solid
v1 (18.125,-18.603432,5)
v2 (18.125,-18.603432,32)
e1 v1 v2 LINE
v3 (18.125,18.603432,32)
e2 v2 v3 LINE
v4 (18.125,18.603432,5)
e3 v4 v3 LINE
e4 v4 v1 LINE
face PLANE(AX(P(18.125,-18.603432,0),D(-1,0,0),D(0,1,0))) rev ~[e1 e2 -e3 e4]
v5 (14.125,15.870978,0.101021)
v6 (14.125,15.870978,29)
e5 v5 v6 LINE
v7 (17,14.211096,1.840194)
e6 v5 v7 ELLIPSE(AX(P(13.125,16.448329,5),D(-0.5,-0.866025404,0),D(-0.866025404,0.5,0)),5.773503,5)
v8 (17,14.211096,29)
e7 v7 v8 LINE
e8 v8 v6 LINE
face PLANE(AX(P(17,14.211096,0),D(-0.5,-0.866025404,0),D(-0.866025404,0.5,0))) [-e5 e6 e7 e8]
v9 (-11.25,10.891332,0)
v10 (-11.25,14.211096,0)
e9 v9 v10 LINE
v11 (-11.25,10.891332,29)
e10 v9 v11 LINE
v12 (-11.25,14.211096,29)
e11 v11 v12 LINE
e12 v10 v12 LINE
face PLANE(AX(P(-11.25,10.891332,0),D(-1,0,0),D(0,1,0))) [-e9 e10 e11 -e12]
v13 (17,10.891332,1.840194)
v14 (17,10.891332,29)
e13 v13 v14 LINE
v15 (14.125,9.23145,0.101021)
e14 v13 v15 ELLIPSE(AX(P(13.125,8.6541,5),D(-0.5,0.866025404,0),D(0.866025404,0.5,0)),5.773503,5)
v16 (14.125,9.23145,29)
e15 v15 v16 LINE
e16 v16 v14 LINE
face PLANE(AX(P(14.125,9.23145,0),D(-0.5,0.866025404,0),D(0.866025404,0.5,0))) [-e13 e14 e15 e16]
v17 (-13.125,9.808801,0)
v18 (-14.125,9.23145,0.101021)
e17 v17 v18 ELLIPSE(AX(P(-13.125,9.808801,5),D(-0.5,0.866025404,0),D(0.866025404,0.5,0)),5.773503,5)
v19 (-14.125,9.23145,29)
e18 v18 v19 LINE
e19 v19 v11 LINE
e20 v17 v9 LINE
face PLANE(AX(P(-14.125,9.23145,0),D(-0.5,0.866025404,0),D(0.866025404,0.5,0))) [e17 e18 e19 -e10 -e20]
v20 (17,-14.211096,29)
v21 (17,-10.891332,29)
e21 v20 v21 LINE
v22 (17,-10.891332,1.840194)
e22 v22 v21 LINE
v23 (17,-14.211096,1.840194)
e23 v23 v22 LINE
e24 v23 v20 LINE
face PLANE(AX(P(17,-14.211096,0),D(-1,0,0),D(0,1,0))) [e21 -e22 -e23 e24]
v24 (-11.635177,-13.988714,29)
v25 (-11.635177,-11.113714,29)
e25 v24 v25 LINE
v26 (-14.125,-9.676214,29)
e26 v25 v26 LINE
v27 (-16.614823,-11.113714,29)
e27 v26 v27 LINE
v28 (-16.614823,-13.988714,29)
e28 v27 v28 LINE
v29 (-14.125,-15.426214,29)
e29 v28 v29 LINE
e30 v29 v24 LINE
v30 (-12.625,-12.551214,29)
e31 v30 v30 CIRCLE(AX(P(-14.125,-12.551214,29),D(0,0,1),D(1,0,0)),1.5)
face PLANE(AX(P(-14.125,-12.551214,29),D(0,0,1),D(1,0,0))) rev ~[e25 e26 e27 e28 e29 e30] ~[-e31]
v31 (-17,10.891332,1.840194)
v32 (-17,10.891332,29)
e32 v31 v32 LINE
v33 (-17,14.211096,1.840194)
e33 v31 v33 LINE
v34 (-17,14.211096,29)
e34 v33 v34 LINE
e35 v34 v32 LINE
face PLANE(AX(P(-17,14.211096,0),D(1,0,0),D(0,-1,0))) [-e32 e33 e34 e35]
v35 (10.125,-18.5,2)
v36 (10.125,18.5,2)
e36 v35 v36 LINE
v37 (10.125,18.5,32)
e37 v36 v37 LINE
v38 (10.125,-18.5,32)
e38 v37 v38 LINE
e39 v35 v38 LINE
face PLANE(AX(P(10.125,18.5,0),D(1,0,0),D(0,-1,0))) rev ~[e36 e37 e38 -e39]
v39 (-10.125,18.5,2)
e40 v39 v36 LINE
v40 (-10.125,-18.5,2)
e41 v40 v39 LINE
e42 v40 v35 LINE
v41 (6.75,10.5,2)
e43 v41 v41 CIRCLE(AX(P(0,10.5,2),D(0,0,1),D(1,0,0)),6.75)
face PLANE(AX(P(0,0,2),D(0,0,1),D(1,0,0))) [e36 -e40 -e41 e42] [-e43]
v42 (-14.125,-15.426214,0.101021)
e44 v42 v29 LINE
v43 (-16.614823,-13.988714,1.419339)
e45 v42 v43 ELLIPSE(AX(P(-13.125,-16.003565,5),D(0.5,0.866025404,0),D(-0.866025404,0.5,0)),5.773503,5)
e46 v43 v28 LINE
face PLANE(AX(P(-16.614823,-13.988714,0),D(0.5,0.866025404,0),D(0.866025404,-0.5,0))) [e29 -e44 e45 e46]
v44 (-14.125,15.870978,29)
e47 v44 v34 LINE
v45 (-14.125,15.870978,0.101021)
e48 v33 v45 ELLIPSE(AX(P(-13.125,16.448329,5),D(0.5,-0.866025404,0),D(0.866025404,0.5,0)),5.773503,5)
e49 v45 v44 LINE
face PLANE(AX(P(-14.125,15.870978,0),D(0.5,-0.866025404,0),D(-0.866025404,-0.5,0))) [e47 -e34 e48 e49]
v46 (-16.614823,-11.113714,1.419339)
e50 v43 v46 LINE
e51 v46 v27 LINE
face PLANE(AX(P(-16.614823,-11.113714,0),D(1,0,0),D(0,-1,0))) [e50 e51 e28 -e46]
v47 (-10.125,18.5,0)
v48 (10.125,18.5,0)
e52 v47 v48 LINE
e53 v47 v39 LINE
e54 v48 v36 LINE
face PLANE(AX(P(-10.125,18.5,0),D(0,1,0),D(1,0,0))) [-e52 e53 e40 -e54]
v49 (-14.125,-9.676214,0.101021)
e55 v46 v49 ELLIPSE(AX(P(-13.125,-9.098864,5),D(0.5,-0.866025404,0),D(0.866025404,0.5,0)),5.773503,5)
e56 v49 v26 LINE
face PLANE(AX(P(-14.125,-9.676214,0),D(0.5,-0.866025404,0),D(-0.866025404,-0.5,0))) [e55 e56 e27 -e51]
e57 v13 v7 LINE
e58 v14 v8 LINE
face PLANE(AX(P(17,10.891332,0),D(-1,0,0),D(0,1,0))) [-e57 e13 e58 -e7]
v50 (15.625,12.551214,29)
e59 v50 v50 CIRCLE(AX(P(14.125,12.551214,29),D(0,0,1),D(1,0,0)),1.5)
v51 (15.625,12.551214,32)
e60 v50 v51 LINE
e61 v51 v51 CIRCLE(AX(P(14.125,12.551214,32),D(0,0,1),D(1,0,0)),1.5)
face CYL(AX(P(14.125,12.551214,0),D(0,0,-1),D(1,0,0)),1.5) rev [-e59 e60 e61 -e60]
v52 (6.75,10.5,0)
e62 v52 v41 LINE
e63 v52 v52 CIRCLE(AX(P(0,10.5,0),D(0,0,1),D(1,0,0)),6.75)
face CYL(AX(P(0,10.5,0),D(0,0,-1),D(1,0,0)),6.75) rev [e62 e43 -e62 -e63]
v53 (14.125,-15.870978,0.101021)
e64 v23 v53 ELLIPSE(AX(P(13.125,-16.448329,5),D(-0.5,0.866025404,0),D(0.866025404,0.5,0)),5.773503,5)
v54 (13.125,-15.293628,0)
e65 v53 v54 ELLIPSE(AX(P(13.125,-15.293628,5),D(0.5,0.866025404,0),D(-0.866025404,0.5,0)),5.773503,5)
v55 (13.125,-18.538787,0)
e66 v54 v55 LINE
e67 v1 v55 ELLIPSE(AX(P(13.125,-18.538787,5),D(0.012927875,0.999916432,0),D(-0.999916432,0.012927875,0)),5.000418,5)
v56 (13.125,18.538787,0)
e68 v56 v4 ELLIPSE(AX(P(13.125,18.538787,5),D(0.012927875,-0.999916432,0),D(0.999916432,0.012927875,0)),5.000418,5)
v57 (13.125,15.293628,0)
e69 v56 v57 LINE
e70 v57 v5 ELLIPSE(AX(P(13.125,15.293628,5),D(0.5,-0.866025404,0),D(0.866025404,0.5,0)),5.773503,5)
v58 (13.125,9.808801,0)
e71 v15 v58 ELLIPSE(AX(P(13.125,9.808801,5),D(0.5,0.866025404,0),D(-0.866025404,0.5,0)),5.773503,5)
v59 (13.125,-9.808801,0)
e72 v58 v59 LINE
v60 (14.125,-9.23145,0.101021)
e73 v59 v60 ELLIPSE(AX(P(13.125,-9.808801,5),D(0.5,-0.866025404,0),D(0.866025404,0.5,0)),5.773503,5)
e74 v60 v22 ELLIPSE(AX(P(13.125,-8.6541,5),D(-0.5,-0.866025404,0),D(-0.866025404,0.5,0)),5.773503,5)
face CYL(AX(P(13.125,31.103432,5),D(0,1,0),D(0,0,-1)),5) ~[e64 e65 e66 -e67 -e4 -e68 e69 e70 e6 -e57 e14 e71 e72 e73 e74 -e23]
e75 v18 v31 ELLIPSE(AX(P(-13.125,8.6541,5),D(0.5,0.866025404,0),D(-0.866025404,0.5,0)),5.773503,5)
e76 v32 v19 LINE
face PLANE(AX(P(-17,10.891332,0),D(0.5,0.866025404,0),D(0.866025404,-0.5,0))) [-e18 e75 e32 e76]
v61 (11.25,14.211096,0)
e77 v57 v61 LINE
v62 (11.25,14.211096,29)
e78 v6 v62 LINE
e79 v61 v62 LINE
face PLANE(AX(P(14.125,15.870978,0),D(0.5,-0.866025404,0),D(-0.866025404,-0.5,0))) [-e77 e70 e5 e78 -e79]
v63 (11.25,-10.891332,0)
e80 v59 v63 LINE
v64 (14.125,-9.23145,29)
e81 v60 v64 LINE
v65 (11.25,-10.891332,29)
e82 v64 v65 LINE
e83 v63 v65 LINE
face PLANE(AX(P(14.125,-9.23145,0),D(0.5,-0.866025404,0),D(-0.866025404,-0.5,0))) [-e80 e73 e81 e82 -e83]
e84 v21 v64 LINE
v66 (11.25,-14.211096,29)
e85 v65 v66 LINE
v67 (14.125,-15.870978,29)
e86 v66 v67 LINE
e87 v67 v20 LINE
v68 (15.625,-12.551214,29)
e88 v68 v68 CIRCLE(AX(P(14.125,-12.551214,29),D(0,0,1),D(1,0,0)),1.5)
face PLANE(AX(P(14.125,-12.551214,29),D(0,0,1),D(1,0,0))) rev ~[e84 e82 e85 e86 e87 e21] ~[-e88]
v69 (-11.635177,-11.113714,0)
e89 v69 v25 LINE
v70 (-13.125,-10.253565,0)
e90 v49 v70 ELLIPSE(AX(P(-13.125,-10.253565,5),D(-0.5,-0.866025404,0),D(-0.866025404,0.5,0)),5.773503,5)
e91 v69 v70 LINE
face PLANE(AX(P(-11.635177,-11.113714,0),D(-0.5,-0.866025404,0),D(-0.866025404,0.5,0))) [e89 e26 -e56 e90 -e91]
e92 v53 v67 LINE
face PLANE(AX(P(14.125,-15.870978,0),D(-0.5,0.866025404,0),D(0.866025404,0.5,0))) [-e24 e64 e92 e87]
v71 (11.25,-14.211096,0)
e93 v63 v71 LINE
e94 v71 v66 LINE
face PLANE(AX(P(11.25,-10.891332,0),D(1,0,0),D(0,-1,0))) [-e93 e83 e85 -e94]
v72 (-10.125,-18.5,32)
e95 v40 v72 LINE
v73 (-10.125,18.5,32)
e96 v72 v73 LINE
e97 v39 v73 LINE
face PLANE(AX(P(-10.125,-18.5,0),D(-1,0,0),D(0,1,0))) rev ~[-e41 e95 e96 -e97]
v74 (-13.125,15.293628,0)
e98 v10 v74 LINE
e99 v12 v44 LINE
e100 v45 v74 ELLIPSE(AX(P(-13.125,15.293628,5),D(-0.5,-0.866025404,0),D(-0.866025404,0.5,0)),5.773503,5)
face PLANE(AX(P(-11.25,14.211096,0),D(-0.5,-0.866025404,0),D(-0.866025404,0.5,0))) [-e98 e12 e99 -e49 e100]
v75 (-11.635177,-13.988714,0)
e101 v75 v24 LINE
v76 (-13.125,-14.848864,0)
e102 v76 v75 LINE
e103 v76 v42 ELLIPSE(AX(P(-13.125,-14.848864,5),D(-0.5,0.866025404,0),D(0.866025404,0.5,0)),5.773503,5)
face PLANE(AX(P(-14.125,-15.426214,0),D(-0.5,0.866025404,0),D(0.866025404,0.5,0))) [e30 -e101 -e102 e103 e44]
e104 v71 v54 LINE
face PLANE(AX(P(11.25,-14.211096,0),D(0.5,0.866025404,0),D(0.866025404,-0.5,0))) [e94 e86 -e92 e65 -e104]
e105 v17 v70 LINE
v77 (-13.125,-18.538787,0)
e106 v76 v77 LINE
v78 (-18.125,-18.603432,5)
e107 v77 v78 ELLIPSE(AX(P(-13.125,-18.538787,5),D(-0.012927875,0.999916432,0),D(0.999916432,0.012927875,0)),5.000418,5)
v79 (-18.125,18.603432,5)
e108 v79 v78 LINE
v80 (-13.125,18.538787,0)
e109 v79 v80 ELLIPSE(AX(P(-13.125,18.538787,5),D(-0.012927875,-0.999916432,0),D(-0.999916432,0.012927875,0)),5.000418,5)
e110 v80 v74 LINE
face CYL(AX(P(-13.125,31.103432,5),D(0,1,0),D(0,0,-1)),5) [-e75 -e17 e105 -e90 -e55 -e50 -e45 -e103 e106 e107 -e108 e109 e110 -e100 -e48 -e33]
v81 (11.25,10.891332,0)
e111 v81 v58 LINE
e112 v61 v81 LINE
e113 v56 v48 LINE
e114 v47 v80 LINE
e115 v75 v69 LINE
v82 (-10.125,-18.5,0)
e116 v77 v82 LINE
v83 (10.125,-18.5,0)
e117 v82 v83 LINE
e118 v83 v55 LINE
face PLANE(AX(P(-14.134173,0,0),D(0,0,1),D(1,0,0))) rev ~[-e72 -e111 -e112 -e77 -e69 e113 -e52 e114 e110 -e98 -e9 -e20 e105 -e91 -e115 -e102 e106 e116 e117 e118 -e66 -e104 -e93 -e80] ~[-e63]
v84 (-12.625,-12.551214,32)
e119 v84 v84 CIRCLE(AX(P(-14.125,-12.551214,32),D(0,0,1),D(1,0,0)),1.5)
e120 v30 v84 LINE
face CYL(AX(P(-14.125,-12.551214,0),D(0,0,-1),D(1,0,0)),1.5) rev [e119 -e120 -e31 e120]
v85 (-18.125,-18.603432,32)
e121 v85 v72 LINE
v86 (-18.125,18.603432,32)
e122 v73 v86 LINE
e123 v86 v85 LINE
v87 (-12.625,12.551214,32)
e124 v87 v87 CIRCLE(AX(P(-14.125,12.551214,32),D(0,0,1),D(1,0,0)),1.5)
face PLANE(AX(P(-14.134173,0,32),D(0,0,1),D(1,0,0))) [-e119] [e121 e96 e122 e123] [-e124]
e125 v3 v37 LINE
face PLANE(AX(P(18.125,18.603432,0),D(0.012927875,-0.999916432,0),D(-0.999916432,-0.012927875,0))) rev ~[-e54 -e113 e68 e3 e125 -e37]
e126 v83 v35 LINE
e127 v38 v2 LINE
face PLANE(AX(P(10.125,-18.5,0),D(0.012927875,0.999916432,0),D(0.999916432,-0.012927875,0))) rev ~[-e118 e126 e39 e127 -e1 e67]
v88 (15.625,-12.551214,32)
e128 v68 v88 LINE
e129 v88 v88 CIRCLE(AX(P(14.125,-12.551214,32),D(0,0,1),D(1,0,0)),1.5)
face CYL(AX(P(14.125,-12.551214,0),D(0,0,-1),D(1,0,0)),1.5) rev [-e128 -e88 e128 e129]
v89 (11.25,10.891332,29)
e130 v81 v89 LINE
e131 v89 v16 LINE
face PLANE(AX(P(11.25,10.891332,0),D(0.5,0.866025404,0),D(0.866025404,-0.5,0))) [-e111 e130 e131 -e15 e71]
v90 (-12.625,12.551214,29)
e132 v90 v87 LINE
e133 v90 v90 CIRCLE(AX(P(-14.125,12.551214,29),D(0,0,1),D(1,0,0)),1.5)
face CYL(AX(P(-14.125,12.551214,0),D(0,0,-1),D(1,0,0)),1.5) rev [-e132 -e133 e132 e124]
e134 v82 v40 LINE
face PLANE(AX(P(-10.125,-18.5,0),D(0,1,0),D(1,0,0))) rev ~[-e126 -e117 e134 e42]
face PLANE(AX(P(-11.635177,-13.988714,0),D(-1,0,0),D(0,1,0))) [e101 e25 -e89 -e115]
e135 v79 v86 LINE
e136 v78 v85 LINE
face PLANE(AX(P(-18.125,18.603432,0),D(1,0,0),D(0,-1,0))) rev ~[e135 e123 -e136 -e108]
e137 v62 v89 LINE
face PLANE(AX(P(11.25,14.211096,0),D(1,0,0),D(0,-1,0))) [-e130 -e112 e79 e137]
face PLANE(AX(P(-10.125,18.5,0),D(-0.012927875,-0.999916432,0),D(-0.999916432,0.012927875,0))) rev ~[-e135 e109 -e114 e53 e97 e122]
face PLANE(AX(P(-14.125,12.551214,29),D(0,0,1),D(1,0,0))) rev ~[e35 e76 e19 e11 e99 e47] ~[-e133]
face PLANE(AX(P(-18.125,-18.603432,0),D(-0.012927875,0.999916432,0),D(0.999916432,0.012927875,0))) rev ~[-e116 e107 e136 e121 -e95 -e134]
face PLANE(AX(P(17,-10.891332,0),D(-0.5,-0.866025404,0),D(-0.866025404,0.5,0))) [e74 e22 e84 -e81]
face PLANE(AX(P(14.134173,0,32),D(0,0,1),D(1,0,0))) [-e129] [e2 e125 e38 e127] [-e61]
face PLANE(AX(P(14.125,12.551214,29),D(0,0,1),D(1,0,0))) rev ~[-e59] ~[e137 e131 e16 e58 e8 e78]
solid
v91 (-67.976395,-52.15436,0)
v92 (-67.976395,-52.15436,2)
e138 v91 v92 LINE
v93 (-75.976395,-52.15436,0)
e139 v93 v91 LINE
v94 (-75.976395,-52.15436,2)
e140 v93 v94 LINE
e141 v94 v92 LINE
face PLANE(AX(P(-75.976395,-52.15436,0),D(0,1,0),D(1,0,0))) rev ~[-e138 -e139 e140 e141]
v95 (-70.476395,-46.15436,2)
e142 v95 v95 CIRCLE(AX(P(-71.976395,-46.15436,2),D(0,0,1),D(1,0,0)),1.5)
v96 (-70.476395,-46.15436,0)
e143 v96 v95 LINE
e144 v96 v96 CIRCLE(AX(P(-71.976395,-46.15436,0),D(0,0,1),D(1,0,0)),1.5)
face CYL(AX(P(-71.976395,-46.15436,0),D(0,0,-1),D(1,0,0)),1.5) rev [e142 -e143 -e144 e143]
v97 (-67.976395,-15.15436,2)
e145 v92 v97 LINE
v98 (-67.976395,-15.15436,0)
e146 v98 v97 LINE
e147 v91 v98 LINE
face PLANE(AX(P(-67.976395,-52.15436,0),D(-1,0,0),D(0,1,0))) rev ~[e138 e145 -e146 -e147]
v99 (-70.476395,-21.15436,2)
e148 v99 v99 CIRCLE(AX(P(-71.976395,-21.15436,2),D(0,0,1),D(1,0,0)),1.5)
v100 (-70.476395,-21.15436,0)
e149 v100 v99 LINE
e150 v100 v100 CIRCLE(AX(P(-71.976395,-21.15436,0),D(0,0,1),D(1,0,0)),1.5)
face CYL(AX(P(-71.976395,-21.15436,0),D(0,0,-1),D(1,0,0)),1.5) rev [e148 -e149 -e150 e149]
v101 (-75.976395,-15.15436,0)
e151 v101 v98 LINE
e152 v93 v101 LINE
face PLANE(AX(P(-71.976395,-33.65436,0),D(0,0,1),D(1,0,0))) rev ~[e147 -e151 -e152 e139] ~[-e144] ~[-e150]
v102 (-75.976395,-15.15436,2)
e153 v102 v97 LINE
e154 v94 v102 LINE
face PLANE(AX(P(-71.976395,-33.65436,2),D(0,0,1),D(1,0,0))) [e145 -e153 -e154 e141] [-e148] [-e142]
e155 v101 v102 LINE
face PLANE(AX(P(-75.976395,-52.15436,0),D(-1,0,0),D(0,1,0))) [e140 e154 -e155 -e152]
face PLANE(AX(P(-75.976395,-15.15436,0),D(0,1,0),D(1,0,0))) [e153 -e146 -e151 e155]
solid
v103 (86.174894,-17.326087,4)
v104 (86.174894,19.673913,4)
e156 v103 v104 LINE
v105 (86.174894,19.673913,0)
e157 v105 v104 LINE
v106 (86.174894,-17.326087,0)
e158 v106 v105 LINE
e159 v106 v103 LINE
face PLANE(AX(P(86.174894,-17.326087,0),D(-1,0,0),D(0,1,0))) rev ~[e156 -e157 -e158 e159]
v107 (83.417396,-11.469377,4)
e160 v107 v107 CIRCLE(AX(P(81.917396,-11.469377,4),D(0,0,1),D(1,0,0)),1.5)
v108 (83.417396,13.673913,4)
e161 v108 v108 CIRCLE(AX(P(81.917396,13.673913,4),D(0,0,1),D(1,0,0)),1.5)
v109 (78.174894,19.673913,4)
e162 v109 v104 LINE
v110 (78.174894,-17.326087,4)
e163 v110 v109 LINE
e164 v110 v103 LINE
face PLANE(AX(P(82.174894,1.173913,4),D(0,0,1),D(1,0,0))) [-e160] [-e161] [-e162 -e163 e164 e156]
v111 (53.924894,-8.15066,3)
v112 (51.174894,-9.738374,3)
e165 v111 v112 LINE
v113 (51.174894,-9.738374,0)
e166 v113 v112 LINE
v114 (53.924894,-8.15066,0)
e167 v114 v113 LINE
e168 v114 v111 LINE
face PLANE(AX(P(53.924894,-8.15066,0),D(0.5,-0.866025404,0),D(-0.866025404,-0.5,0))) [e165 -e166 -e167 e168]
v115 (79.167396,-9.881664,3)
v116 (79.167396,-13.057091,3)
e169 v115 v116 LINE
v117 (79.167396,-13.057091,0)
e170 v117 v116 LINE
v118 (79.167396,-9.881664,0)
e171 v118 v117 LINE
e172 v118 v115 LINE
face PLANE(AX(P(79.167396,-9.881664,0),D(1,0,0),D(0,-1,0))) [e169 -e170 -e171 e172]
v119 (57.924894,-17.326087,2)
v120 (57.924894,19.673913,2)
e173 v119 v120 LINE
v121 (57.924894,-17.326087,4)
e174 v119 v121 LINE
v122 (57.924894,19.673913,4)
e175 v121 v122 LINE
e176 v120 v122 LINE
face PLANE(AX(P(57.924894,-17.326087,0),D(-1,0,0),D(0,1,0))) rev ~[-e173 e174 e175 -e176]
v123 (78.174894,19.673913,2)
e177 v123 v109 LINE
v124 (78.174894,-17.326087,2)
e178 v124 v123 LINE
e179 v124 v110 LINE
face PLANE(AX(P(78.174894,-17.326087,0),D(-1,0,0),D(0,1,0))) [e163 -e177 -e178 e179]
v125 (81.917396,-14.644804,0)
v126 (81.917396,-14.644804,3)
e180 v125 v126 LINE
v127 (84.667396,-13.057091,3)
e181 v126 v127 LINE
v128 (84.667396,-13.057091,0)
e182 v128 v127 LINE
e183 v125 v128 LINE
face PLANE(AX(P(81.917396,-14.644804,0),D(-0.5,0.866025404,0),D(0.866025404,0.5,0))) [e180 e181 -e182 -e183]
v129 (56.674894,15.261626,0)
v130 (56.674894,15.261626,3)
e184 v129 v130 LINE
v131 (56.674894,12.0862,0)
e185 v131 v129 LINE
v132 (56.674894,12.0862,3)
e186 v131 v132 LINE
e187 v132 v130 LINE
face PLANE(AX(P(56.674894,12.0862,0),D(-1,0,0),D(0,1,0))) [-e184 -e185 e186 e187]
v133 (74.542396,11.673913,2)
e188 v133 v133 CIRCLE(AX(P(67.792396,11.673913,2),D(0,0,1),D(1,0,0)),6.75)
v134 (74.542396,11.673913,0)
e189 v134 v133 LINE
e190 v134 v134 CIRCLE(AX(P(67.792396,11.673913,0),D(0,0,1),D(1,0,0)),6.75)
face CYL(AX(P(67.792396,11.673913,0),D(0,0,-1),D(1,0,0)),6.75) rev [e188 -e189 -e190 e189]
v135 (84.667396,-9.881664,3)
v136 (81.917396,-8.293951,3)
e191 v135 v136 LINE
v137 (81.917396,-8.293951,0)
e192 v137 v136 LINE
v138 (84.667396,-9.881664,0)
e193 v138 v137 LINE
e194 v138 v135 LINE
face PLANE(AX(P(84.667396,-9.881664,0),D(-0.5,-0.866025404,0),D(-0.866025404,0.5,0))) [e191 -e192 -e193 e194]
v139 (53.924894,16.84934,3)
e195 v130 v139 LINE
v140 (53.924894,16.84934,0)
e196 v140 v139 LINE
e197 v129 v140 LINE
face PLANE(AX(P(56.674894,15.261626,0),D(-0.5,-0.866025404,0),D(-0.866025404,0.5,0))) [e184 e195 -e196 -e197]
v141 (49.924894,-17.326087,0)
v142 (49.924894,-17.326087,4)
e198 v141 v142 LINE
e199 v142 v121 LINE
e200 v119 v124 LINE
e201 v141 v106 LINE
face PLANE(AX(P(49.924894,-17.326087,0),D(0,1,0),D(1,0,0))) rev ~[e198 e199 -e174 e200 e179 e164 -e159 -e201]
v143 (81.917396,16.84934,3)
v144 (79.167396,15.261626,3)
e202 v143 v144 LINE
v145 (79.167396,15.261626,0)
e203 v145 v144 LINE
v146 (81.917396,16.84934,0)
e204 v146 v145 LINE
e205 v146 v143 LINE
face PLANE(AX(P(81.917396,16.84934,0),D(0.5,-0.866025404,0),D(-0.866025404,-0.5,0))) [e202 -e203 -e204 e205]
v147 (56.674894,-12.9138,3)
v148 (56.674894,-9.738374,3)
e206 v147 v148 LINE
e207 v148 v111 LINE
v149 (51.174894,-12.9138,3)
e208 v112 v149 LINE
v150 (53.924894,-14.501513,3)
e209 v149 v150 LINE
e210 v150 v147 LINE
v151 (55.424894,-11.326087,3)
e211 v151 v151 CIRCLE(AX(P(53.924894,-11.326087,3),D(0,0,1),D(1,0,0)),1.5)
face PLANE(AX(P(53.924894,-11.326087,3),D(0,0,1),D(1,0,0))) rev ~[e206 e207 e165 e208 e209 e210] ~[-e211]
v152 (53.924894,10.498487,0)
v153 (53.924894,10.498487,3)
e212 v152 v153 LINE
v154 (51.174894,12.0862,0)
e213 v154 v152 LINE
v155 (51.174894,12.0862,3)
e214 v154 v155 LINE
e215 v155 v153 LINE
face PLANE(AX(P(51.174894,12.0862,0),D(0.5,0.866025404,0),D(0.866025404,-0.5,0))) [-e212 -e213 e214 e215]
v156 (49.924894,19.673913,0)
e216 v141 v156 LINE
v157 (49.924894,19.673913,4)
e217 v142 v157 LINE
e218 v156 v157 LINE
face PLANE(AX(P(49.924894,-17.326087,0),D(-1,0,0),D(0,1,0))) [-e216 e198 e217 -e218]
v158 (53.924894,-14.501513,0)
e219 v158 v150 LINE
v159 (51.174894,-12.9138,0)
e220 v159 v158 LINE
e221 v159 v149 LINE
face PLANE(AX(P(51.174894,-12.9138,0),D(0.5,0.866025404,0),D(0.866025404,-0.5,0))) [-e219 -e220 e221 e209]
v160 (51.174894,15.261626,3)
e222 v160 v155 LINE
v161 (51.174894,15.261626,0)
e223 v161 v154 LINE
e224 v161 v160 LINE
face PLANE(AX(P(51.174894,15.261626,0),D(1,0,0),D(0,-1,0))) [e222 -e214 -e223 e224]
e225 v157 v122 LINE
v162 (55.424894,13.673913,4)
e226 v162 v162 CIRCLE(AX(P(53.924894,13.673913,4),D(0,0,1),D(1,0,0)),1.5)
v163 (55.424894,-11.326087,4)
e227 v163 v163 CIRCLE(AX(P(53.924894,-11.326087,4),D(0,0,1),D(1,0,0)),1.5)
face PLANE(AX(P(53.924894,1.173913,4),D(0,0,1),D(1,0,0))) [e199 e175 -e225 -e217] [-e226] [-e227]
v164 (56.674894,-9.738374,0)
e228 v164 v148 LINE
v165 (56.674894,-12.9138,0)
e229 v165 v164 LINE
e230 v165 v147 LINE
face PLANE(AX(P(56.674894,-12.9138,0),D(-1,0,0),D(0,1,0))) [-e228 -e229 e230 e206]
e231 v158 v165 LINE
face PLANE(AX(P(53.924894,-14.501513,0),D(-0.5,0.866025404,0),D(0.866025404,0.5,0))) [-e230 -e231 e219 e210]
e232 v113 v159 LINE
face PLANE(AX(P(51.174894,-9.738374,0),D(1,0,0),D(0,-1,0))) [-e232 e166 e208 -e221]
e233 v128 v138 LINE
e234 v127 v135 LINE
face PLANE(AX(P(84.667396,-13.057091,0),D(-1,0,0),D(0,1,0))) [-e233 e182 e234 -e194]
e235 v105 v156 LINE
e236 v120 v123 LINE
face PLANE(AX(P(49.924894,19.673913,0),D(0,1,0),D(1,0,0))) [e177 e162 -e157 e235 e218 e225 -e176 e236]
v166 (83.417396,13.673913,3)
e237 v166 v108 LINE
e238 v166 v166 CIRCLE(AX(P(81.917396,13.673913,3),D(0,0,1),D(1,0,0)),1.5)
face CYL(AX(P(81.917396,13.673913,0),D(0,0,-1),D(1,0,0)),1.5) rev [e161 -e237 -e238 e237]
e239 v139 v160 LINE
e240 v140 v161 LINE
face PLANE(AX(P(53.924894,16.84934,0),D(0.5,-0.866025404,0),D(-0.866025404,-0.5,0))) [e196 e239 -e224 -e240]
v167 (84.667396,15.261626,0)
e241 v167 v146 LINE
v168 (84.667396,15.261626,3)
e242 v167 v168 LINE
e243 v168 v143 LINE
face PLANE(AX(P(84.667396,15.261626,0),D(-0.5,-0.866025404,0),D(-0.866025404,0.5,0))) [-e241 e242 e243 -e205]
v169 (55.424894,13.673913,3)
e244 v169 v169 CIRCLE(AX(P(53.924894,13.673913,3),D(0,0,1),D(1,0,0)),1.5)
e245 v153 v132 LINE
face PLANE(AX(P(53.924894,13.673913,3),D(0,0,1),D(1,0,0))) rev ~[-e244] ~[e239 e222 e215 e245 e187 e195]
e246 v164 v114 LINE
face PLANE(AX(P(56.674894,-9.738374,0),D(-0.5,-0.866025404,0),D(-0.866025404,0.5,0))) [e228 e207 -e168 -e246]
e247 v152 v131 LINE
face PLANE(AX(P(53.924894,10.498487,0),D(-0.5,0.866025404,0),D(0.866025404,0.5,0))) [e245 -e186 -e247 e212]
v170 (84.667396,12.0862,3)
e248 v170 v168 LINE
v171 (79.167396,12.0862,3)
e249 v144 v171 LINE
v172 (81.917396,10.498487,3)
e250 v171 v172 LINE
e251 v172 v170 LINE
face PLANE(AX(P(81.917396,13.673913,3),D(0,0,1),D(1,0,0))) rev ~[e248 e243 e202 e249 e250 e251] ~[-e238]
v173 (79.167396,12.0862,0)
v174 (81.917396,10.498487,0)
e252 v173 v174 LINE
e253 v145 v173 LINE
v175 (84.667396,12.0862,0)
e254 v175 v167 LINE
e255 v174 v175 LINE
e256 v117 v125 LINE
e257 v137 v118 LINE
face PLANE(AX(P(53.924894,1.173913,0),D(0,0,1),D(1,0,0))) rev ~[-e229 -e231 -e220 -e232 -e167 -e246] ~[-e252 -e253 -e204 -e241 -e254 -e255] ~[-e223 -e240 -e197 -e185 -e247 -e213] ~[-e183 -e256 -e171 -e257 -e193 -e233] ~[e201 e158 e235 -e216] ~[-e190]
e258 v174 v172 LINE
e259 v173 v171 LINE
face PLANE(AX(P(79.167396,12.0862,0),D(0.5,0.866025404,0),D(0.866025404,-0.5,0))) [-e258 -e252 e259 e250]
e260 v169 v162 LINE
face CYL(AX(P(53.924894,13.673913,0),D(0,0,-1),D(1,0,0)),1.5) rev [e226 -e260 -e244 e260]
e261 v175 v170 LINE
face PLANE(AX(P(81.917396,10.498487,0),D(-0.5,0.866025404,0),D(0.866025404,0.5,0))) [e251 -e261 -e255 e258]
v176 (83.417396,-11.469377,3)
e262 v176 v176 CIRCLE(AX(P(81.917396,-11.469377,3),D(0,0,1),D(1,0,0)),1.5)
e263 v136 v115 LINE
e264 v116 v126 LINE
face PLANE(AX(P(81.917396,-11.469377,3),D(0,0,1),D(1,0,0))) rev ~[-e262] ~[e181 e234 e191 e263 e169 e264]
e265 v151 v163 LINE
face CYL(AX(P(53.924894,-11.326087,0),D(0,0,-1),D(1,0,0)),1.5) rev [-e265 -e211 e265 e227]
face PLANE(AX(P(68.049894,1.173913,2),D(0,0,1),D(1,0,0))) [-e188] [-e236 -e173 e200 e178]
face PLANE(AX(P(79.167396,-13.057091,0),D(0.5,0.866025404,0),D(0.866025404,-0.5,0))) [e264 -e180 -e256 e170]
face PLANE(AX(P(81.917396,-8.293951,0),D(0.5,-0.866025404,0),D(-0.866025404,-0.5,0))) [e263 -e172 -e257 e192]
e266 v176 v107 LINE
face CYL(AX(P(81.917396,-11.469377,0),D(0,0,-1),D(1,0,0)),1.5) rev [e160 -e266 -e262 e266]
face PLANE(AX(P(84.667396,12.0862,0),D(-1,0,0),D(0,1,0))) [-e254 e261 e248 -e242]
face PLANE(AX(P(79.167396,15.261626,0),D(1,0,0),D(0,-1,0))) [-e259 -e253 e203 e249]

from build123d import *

# Parameters (mm, degrees)
F0_W         = 20.25
F0_H         = 37
F0_R         = 6.75
F1_DEPTH     = 2
F0_R_2       = 1.5
F2_DEPTH     = 32
F3_DEPTH     = 29
F4_W         = 20.25
F4_H         = 37
F4_R         = 6.75
F5_DEPTH     = 2
F6_W         = 8
F6_H         = 37
F6_R         = 1.5
F7_DEPTH     = 2
F4_W_2       = 8
F4_R_2       = 1.5
F8_DEPTH     = 4
F9_DEPTH     = 3
F10_T1_DEPTH = 62.2068632793


# Not quite as in the source:
# - a fillet or chamfer that OpenCascade refuses, or shapes differently, is made with other operations: its cross-section is extruded or revolved along the edge and cut away or added


with BuildPart() as f1:
    # F0 (on Top) → F1 (new body)
    with BuildSketch(Plane.XY):
        Rectangle(F0_W, F0_H)
        with Locations((0, 10.5)):
            Circle(F0_R, mode=Mode.SUBTRACT)
    extrude(amount=F1_DEPTH)

    # F0 (on Top) → F2 (join)
    with BuildSketch(Plane.XY):
        Polygon((-10.125, -18.5), (-10.125, 18.5), (-18.125, 18.6034316397), (-18.125, -18.6034316397), align=None)
        Polygon((-16.6148230359, -11.1137143672), (-14.125, -9.6762143672), (-11.6351769641, -11.1137143672), (-11.6351769641, -13.9887143672), (-14.125, -15.4262143672), (-16.6148230359, -13.9887143672), align=None, mode=Mode.SUBTRACT)
        Polygon((-17, 14.2110963911), (-14.125, 15.870978415), (-11.25, 14.2110963911), (-11.25, 10.8913323432), (-14.125, 9.2314503193), (-17, 10.8913323432), align=None, mode=Mode.SUBTRACT)
        Polygon((18.125, 18.6034316397), (10.125, 18.5), (10.125, -18.5), (18.125, -18.6034316397), align=None)
        Polygon((11.25, -10.8913323432), (14.125, -9.2314503193), (17, -10.8913323432), (17, -14.2110963911), (14.125, -15.870978415), (11.25, -14.2110963911), align=None, mode=Mode.SUBTRACT)
        Polygon((11.25, 14.2110963911), (14.125, 15.870978415), (17, 14.2110963911), (17, 10.8913323432), (14.125, 9.2314503193), (11.25, 10.8913323432), align=None, mode=Mode.SUBTRACT)
        Polygon((17, -10.8913323432), (14.125, -9.2314503193), (11.25, -10.8913323432), (11.25, -14.2110963911), (14.125, -15.870978415), (17, -14.2110963911), align=None)
        with Locations((14.125, -12.5512143672)):
            Circle(F0_R_2, mode=Mode.SUBTRACT)
        Polygon((-11.6351769641, -11.1137143672), (-14.125, -9.6762143672), (-16.6148230359, -11.1137143672), (-16.6148230359, -13.9887143672), (-14.125, -15.4262143672), (-11.6351769641, -13.9887143672), align=None)
        with Locations((-14.125, -12.5512143672)):
            Circle(F0_R_2, mode=Mode.SUBTRACT)
        Polygon((-11.25, 14.2110963911), (-14.125, 15.870978415), (-17, 14.2110963911), (-17, 10.8913323432), (-14.125, 9.2314503193), (-11.25, 10.8913323432), align=None)
        with Locations((-14.125, 12.5512143672)):
            Circle(F0_R_2, mode=Mode.SUBTRACT)
        Polygon((17, 14.2110963911), (14.125, 15.870978415), (11.25, 14.2110963911), (11.25, 10.8913323432), (14.125, 9.2314503193), (17, 10.8913323432), align=None)
        with Locations((14.125, 12.5512143672)):
            Circle(F0_R_2, mode=Mode.SUBTRACT)
    extrude(amount=F2_DEPTH)

    # F0 (on Top) → F3 (cut)
    with BuildSketch(Plane.XY):
        Polygon((17, -10.8913323432), (14.125, -9.2314503193), (11.25, -10.8913323432), (11.25, -14.2110963911), (14.125, -15.870978415), (17, -14.2110963911), align=None)
        with Locations((14.125, -12.5512143672)):
            Circle(F0_R_2, mode=Mode.SUBTRACT)
        Polygon((17, 14.2110963911), (14.125, 15.870978415), (11.25, 14.2110963911), (11.25, 10.8913323432), (14.125, 9.2314503193), (17, 10.8913323432), align=None)
        with Locations((14.125, 12.5512143672)):
            Circle(F0_R_2, mode=Mode.SUBTRACT)
        Polygon((-11.25, 14.2110963911), (-14.125, 15.870978415), (-17, 14.2110963911), (-17, 10.8913323432), (-14.125, 9.2314503193), (-11.25, 10.8913323432), align=None)
        with Locations((-14.125, 12.5512143672)):
            Circle(F0_R_2, mode=Mode.SUBTRACT)
        Polygon((-11.6351769641, -11.1137143672), (-14.125, -9.6762143672), (-16.6148230359, -11.1137143672), (-16.6148230359, -13.9887143672), (-14.125, -15.4262143672), (-11.6351769641, -13.9887143672), align=None)
        with Locations((-14.125, -12.5512143672)):
            Circle(F0_R_2, mode=Mode.SUBTRACT)
    extrude(amount=F3_DEPTH, mode=Mode.SUBTRACT)

    # F10: fillet of radius 5 on 2 edges, made by hand

    # F10_s2 → F10_t1 (cut)
    with BuildSketch(Plane.XZ.offset(-31.1034316397)):
        with BuildLine():
            ThreePointArc((-13.125, 0), (-16.6605339059, 1.4644660941), (-18.125, 5))
            Line((-18.125, 5), (-18.125, 0))
            Line((-18.125, 0), (-13.125, 0))
        make_face()
        with BuildLine():
            ThreePointArc((13.125, 0), (16.6605339059, 1.4644660941), (18.125, 5))
            Line((18.125, 5), (18.125, 0))
            Line((18.125, 0), (13.125, 0))
        make_face()
    extrude(amount=F10_T1_DEPTH, mode=Mode.SUBTRACT)


with BuildPart() as f5:
    # F4 (on Top) → F5 (new body)
    with BuildSketch(Plane.XY):
        with Locations((68.0498939753, 1.1739132404)):
            Rectangle(F4_W, F4_H)
        with Locations((67.7923956513, 11.6739132404)):
            Circle(F4_R, mode=Mode.SUBTRACT)
    extrude(amount=F5_DEPTH)

    # F4 (on Top) → F8 (join)
    with BuildSketch(Plane.XY):
        with Locations((53.9248939753, 1.1739132404)):
            Rectangle(F4_W_2, F4_H)
        Polygon((53.9248939753, -14.5015132401), (51.1748939753, -12.9137999998), (51.1748939753, -9.7383735193), (53.9248939753, -8.150660279), (56.6748939753, -9.7383735193), (56.6748939753, -12.9137999998), align=None, mode=Mode.SUBTRACT)
        Polygon((53.9248939753, 10.4984867599), (51.1748939753, 12.0862000002), (51.1748939753, 15.2616264807), (53.9248939753, 16.849339721), (56.6748939753, 15.2616264807), (56.6748939753, 12.0862000002), align=None, mode=Mode.SUBTRACT)
        with Locations((82.1748939753, 1.1739132404)):
            Rectangle(F4_W_2, F4_H)
        Polygon((81.9173956513, -8.2939509534), (84.6673956513, -9.8816641936), (84.6673956513, -13.0570906742), (81.9173956513, -14.6448039144), (79.1673956513, -13.0570906742), (79.1673956513, -9.8816641936), align=None, mode=Mode.SUBTRACT)
        Polygon((81.9173956513, 16.849339721), (84.6673956513, 15.2616264807), (84.6673956513, 12.0862000002), (81.9173956513, 10.4984867599), (79.1673956513, 12.0862000002), (79.1673956513, 15.2616264807), align=None, mode=Mode.SUBTRACT)
        Polygon((51.1748939753, -9.7383735193), (51.1748939753, -12.9137999998), (53.9248939753, -14.5015132401), (56.6748939753, -12.9137999998), (56.6748939753, -9.7383735193), (53.9248939753, -8.150660279), align=None)
        with Locations((53.9248939753, -11.3260867596)):
            Circle(F4_R_2, mode=Mode.SUBTRACT)
        Polygon((51.1748939753, 15.2616264807), (51.1748939753, 12.0862000002), (53.9248939753, 10.4984867599), (56.6748939753, 12.0862000002), (56.6748939753, 15.2616264807), (53.9248939753, 16.849339721), align=None)
        with Locations((53.9248939753, 13.6739132404)):
            Circle(F4_R_2, mode=Mode.SUBTRACT)
        Polygon((84.6673956513, -13.0570906742), (84.6673956513, -9.8816641936), (81.9173956513, -8.2939509534), (79.1673956513, -9.8816641936), (79.1673956513, -13.0570906742), (81.9173956513, -14.6448039144), align=None)
        with Locations((81.9173956513, -11.4693774339)):
            Circle(F4_R_2, mode=Mode.SUBTRACT)
        Polygon((84.6673956513, 12.0862000002), (84.6673956513, 15.2616264807), (81.9173956513, 16.849339721), (79.1673956513, 15.2616264807), (79.1673956513, 12.0862000002), (81.9173956513, 10.4984867599), align=None)
        with Locations((81.9173956513, 13.6739132404)):
            Circle(F4_R_2, mode=Mode.SUBTRACT)
    extrude(amount=F8_DEPTH)

    # F4 (on Top) → F9 (cut)
    with BuildSketch(Plane.XY):
        Polygon((51.1748939753, 15.2616264807), (51.1748939753, 12.0862000002), (53.9248939753, 10.4984867599), (56.6748939753, 12.0862000002), (56.6748939753, 15.2616264807), (53.9248939753, 16.849339721), align=None)
        with Locations((53.9248939753, 13.6739132404)):
            Circle(F4_R_2, mode=Mode.SUBTRACT)
        Polygon((84.6673956513, 12.0862000002), (84.6673956513, 15.2616264807), (81.9173956513, 16.849339721), (79.1673956513, 15.2616264807), (79.1673956513, 12.0862000002), (81.9173956513, 10.4984867599), align=None)
        with Locations((81.9173956513, 13.6739132404)):
            Circle(F4_R_2, mode=Mode.SUBTRACT)
        Polygon((84.6673956513, -13.0570906742), (84.6673956513, -9.8816641936), (81.9173956513, -8.2939509534), (79.1673956513, -9.8816641936), (79.1673956513, -13.0570906742), (81.9173956513, -14.6448039144), align=None)
        with Locations((81.9173956513, -11.4693774339)):
            Circle(F4_R_2, mode=Mode.SUBTRACT)
        Polygon((51.1748939753, -9.7383735193), (51.1748939753, -12.9137999998), (53.9248939753, -14.5015132401), (56.6748939753, -12.9137999998), (56.6748939753, -9.7383735193), (53.9248939753, -8.150660279), align=None)
        with Locations((53.9248939753, -11.3260867596)):
            Circle(F4_R_2, mode=Mode.SUBTRACT)
    extrude(amount=F9_DEPTH, mode=Mode.SUBTRACT)


with BuildPart() as f7:
    # F6 (on Top) → F7 (new body)
    with BuildSketch(Plane.XY):
        with Locations((-71.9763954457, -33.6543595721)):
            Rectangle(F6_W, F6_H)
        with Locations((-71.9763954457, -46.1543595721)):
            Circle(F6_R, mode=Mode.SUBTRACT)
        with Locations((-71.9763954457, -21.1543595721)):
            Circle(F6_R, mode=Mode.SUBTRACT)
    extrude(amount=F7_DEPTH)


solid = Compound([f1.part, f5.part, f7.part])
